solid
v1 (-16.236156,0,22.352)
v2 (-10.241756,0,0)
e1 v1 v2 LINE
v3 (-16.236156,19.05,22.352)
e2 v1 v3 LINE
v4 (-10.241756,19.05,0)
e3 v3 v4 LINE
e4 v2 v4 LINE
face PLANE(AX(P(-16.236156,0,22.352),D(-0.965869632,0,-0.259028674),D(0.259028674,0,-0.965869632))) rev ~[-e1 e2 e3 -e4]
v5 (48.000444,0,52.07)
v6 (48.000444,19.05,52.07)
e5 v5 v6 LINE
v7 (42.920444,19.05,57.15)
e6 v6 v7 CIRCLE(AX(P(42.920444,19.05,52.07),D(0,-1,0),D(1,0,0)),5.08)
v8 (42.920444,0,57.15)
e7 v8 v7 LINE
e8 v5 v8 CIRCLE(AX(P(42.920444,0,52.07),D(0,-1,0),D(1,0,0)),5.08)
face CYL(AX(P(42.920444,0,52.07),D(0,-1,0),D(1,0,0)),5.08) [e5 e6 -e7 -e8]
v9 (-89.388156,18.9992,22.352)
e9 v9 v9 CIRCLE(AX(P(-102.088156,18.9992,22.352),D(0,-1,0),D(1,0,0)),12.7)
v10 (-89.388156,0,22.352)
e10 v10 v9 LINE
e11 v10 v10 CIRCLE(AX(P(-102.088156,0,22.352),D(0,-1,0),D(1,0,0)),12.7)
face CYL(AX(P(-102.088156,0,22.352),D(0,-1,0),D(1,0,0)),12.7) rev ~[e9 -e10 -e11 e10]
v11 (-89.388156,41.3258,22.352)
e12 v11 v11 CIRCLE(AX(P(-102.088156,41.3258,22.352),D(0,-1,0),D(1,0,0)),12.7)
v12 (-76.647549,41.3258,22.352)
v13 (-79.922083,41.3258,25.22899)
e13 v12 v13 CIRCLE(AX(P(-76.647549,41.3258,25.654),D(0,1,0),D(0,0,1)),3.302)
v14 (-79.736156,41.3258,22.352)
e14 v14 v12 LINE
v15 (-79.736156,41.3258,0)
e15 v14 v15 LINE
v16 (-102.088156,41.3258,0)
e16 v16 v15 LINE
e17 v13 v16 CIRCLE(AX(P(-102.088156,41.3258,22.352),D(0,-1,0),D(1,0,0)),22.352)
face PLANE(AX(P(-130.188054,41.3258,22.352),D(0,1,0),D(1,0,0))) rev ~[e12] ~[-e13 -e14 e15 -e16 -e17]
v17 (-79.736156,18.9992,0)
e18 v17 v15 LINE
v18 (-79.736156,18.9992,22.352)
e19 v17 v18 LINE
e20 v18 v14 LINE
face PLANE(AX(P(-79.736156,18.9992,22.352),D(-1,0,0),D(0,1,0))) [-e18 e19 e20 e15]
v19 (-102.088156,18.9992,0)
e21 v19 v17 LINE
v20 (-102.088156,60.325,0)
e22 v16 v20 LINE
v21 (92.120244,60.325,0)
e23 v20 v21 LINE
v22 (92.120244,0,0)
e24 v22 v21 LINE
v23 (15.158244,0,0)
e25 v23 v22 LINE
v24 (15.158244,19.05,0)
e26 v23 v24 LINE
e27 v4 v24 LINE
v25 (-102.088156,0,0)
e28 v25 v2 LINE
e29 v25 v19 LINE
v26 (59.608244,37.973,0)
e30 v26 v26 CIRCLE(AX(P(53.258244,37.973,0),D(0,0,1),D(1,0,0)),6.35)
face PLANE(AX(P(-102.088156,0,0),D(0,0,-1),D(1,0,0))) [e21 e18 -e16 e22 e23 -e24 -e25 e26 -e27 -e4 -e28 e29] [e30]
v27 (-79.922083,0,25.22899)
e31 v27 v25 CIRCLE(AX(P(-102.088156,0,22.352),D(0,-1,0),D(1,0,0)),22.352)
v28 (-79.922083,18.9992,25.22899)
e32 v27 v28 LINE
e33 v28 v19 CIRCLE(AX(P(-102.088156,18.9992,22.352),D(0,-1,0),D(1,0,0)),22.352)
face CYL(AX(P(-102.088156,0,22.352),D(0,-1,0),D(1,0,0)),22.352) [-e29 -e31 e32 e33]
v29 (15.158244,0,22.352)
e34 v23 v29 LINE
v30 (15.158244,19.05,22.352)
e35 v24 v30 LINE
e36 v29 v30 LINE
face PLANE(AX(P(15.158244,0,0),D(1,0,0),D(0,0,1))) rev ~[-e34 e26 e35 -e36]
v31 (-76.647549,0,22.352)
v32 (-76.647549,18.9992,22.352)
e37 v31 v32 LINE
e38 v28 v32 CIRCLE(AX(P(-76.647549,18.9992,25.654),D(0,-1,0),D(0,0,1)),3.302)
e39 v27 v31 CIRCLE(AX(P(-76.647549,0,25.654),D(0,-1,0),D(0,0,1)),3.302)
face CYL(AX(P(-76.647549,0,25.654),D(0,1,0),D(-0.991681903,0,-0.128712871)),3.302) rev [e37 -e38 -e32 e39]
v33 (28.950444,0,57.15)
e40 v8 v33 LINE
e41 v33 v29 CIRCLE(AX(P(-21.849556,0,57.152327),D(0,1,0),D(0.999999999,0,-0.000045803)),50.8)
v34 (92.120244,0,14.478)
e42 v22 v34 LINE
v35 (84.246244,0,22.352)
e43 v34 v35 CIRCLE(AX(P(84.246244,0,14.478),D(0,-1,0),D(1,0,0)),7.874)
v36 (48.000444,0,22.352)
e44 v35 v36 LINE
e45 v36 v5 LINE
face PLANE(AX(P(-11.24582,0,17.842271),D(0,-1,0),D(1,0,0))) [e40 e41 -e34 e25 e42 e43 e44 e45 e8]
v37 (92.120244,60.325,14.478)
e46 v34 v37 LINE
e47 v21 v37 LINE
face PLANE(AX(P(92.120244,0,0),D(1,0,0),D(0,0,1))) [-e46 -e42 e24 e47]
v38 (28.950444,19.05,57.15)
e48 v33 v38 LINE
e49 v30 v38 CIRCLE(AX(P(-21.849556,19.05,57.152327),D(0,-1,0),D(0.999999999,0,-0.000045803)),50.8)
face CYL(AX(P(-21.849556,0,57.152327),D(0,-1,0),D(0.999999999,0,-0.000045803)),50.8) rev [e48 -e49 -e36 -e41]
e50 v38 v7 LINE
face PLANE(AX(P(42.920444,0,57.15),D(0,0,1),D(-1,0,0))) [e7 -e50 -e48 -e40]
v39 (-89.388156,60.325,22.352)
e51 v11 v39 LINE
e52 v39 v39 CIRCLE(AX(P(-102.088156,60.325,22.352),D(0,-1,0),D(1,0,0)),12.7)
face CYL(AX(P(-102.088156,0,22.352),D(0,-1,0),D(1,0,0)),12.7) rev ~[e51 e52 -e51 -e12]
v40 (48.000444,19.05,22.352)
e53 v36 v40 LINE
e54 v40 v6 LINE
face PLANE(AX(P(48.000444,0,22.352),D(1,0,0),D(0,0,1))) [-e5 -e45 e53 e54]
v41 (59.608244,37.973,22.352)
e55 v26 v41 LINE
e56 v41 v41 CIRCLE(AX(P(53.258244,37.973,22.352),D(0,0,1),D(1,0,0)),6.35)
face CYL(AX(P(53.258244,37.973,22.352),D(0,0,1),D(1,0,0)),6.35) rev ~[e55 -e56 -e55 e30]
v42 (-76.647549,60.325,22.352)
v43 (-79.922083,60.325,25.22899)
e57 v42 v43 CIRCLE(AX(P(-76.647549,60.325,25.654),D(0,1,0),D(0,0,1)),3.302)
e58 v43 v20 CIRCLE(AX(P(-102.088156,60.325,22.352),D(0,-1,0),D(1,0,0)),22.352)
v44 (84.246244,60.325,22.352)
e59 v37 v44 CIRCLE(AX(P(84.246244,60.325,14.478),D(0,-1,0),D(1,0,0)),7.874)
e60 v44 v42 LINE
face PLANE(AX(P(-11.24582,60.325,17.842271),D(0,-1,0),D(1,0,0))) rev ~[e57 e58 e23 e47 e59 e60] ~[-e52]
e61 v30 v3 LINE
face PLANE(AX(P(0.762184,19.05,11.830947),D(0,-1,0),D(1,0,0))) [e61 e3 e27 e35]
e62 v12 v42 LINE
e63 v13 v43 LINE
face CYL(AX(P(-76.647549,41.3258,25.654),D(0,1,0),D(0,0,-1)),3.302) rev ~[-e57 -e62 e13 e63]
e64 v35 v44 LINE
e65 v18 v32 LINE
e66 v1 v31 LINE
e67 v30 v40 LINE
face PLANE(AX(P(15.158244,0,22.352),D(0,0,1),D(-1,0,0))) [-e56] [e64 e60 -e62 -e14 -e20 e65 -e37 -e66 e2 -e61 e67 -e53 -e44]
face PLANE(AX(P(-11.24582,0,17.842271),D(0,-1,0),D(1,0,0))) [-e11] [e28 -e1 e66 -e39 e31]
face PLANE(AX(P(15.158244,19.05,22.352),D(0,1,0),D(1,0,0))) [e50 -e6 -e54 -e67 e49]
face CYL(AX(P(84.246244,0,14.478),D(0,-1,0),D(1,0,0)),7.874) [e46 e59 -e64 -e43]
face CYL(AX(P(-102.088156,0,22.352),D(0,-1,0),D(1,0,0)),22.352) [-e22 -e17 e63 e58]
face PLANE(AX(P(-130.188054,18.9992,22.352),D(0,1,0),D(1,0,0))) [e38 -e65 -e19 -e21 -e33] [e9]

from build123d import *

# Parameters (mm, degrees)
F0_R     = 12.7
F1_DEPTH = 60.325
F2_W     = 32.8422
F2_H     = 41.275
F3_DEPTH = 34.798
F5_DEPTH = 19.05
F6_W     = 50.4518977821
F6_H     = 22.3266
F6_R     = 6.35
F7_DEPTH = 47.498
F8_R     = 3.302


with BuildPart() as f1:
    # F0 (on Front) → F1 (new body)
    with BuildSketch(Plane.XZ):
        with BuildLine():
            ThreePointArc((-79.7361564685, 22.352), (-117.8934072416, 38.1572507731), (-102.0881564685, 0))
            Line((-102.0881564685, 0), (92.1202435315, 0))
            Line((92.1202435315, 0), (92.1202435315, 14.478))
            ThreePointArc((92.1202435315, 14.478), (89.8140023266, 20.0457587951), (84.2462435315, 22.352))
            Line((84.2462435315, 22.352), (48.0004435315, 22.352))
            Line((48.0004435315, 22.352), (48.0004435315, 52.07))
            ThreePointArc((48.0004435315, 52.07), (46.5125459799, 55.6621024484), (42.9204435315, 57.15))
            Line((42.9204435315, 57.15), (28.9504435315, 57.15))
            ThreePointArc((28.9504435315, 57.15), (25.3762588931, 38.4343576341), (15.1582435315, 22.352))
            Line((15.1582435315, 22.352), (-79.7361564685, 22.352))
        make_face()
        with Locations((-102.0881564685, 22.352)):
            Circle(F0_R, mode=Mode.SUBTRACT)
    extrude(amount=-F1_DEPTH)

    # F2 (on face) → F3 (cut, through all)
    with BuildSketch(Plane.XY.offset(22.352)):
        with Locations((31.5793435315, 39.6875)):
            Rectangle(F2_W, F2_H)
    extrude(amount=F3_DEPTH, mode=Mode.SUBTRACT)

    # F4 (on Front) → F5 (cut)
    with BuildSketch(Plane.XZ):
        Polygon((15.1582435315, 0), (15.1582435315, 22.352), (-16.2361564685, 22.352), (-10.2417564685, 0), align=None)
    extrude(amount=-F5_DEPTH, mode=Mode.SUBTRACT)

    # F6 (on face) → F7 (cut, symmetric)
    with BuildSketch(Plane.XY.offset(22.352)):
        with Locations((-104.9621053595, 30.1625)):
            Rectangle(F6_W, F6_H)
        with Locations((53.2582435315, 37.973)):
            Circle(F6_R)
    extrude(amount=F7_DEPTH, both=True, mode=Mode.SUBTRACT)

    # F8
    f8_edges = [f1.edges().sort_by_distance(p)[0] for p in [
        (-79.736156, 9.4996, 22.352),
        (-79.736156, 50.8254, 22.352),
    ]]
    fillet(f8_edges, radius=F8_R)


solid = f1.part
